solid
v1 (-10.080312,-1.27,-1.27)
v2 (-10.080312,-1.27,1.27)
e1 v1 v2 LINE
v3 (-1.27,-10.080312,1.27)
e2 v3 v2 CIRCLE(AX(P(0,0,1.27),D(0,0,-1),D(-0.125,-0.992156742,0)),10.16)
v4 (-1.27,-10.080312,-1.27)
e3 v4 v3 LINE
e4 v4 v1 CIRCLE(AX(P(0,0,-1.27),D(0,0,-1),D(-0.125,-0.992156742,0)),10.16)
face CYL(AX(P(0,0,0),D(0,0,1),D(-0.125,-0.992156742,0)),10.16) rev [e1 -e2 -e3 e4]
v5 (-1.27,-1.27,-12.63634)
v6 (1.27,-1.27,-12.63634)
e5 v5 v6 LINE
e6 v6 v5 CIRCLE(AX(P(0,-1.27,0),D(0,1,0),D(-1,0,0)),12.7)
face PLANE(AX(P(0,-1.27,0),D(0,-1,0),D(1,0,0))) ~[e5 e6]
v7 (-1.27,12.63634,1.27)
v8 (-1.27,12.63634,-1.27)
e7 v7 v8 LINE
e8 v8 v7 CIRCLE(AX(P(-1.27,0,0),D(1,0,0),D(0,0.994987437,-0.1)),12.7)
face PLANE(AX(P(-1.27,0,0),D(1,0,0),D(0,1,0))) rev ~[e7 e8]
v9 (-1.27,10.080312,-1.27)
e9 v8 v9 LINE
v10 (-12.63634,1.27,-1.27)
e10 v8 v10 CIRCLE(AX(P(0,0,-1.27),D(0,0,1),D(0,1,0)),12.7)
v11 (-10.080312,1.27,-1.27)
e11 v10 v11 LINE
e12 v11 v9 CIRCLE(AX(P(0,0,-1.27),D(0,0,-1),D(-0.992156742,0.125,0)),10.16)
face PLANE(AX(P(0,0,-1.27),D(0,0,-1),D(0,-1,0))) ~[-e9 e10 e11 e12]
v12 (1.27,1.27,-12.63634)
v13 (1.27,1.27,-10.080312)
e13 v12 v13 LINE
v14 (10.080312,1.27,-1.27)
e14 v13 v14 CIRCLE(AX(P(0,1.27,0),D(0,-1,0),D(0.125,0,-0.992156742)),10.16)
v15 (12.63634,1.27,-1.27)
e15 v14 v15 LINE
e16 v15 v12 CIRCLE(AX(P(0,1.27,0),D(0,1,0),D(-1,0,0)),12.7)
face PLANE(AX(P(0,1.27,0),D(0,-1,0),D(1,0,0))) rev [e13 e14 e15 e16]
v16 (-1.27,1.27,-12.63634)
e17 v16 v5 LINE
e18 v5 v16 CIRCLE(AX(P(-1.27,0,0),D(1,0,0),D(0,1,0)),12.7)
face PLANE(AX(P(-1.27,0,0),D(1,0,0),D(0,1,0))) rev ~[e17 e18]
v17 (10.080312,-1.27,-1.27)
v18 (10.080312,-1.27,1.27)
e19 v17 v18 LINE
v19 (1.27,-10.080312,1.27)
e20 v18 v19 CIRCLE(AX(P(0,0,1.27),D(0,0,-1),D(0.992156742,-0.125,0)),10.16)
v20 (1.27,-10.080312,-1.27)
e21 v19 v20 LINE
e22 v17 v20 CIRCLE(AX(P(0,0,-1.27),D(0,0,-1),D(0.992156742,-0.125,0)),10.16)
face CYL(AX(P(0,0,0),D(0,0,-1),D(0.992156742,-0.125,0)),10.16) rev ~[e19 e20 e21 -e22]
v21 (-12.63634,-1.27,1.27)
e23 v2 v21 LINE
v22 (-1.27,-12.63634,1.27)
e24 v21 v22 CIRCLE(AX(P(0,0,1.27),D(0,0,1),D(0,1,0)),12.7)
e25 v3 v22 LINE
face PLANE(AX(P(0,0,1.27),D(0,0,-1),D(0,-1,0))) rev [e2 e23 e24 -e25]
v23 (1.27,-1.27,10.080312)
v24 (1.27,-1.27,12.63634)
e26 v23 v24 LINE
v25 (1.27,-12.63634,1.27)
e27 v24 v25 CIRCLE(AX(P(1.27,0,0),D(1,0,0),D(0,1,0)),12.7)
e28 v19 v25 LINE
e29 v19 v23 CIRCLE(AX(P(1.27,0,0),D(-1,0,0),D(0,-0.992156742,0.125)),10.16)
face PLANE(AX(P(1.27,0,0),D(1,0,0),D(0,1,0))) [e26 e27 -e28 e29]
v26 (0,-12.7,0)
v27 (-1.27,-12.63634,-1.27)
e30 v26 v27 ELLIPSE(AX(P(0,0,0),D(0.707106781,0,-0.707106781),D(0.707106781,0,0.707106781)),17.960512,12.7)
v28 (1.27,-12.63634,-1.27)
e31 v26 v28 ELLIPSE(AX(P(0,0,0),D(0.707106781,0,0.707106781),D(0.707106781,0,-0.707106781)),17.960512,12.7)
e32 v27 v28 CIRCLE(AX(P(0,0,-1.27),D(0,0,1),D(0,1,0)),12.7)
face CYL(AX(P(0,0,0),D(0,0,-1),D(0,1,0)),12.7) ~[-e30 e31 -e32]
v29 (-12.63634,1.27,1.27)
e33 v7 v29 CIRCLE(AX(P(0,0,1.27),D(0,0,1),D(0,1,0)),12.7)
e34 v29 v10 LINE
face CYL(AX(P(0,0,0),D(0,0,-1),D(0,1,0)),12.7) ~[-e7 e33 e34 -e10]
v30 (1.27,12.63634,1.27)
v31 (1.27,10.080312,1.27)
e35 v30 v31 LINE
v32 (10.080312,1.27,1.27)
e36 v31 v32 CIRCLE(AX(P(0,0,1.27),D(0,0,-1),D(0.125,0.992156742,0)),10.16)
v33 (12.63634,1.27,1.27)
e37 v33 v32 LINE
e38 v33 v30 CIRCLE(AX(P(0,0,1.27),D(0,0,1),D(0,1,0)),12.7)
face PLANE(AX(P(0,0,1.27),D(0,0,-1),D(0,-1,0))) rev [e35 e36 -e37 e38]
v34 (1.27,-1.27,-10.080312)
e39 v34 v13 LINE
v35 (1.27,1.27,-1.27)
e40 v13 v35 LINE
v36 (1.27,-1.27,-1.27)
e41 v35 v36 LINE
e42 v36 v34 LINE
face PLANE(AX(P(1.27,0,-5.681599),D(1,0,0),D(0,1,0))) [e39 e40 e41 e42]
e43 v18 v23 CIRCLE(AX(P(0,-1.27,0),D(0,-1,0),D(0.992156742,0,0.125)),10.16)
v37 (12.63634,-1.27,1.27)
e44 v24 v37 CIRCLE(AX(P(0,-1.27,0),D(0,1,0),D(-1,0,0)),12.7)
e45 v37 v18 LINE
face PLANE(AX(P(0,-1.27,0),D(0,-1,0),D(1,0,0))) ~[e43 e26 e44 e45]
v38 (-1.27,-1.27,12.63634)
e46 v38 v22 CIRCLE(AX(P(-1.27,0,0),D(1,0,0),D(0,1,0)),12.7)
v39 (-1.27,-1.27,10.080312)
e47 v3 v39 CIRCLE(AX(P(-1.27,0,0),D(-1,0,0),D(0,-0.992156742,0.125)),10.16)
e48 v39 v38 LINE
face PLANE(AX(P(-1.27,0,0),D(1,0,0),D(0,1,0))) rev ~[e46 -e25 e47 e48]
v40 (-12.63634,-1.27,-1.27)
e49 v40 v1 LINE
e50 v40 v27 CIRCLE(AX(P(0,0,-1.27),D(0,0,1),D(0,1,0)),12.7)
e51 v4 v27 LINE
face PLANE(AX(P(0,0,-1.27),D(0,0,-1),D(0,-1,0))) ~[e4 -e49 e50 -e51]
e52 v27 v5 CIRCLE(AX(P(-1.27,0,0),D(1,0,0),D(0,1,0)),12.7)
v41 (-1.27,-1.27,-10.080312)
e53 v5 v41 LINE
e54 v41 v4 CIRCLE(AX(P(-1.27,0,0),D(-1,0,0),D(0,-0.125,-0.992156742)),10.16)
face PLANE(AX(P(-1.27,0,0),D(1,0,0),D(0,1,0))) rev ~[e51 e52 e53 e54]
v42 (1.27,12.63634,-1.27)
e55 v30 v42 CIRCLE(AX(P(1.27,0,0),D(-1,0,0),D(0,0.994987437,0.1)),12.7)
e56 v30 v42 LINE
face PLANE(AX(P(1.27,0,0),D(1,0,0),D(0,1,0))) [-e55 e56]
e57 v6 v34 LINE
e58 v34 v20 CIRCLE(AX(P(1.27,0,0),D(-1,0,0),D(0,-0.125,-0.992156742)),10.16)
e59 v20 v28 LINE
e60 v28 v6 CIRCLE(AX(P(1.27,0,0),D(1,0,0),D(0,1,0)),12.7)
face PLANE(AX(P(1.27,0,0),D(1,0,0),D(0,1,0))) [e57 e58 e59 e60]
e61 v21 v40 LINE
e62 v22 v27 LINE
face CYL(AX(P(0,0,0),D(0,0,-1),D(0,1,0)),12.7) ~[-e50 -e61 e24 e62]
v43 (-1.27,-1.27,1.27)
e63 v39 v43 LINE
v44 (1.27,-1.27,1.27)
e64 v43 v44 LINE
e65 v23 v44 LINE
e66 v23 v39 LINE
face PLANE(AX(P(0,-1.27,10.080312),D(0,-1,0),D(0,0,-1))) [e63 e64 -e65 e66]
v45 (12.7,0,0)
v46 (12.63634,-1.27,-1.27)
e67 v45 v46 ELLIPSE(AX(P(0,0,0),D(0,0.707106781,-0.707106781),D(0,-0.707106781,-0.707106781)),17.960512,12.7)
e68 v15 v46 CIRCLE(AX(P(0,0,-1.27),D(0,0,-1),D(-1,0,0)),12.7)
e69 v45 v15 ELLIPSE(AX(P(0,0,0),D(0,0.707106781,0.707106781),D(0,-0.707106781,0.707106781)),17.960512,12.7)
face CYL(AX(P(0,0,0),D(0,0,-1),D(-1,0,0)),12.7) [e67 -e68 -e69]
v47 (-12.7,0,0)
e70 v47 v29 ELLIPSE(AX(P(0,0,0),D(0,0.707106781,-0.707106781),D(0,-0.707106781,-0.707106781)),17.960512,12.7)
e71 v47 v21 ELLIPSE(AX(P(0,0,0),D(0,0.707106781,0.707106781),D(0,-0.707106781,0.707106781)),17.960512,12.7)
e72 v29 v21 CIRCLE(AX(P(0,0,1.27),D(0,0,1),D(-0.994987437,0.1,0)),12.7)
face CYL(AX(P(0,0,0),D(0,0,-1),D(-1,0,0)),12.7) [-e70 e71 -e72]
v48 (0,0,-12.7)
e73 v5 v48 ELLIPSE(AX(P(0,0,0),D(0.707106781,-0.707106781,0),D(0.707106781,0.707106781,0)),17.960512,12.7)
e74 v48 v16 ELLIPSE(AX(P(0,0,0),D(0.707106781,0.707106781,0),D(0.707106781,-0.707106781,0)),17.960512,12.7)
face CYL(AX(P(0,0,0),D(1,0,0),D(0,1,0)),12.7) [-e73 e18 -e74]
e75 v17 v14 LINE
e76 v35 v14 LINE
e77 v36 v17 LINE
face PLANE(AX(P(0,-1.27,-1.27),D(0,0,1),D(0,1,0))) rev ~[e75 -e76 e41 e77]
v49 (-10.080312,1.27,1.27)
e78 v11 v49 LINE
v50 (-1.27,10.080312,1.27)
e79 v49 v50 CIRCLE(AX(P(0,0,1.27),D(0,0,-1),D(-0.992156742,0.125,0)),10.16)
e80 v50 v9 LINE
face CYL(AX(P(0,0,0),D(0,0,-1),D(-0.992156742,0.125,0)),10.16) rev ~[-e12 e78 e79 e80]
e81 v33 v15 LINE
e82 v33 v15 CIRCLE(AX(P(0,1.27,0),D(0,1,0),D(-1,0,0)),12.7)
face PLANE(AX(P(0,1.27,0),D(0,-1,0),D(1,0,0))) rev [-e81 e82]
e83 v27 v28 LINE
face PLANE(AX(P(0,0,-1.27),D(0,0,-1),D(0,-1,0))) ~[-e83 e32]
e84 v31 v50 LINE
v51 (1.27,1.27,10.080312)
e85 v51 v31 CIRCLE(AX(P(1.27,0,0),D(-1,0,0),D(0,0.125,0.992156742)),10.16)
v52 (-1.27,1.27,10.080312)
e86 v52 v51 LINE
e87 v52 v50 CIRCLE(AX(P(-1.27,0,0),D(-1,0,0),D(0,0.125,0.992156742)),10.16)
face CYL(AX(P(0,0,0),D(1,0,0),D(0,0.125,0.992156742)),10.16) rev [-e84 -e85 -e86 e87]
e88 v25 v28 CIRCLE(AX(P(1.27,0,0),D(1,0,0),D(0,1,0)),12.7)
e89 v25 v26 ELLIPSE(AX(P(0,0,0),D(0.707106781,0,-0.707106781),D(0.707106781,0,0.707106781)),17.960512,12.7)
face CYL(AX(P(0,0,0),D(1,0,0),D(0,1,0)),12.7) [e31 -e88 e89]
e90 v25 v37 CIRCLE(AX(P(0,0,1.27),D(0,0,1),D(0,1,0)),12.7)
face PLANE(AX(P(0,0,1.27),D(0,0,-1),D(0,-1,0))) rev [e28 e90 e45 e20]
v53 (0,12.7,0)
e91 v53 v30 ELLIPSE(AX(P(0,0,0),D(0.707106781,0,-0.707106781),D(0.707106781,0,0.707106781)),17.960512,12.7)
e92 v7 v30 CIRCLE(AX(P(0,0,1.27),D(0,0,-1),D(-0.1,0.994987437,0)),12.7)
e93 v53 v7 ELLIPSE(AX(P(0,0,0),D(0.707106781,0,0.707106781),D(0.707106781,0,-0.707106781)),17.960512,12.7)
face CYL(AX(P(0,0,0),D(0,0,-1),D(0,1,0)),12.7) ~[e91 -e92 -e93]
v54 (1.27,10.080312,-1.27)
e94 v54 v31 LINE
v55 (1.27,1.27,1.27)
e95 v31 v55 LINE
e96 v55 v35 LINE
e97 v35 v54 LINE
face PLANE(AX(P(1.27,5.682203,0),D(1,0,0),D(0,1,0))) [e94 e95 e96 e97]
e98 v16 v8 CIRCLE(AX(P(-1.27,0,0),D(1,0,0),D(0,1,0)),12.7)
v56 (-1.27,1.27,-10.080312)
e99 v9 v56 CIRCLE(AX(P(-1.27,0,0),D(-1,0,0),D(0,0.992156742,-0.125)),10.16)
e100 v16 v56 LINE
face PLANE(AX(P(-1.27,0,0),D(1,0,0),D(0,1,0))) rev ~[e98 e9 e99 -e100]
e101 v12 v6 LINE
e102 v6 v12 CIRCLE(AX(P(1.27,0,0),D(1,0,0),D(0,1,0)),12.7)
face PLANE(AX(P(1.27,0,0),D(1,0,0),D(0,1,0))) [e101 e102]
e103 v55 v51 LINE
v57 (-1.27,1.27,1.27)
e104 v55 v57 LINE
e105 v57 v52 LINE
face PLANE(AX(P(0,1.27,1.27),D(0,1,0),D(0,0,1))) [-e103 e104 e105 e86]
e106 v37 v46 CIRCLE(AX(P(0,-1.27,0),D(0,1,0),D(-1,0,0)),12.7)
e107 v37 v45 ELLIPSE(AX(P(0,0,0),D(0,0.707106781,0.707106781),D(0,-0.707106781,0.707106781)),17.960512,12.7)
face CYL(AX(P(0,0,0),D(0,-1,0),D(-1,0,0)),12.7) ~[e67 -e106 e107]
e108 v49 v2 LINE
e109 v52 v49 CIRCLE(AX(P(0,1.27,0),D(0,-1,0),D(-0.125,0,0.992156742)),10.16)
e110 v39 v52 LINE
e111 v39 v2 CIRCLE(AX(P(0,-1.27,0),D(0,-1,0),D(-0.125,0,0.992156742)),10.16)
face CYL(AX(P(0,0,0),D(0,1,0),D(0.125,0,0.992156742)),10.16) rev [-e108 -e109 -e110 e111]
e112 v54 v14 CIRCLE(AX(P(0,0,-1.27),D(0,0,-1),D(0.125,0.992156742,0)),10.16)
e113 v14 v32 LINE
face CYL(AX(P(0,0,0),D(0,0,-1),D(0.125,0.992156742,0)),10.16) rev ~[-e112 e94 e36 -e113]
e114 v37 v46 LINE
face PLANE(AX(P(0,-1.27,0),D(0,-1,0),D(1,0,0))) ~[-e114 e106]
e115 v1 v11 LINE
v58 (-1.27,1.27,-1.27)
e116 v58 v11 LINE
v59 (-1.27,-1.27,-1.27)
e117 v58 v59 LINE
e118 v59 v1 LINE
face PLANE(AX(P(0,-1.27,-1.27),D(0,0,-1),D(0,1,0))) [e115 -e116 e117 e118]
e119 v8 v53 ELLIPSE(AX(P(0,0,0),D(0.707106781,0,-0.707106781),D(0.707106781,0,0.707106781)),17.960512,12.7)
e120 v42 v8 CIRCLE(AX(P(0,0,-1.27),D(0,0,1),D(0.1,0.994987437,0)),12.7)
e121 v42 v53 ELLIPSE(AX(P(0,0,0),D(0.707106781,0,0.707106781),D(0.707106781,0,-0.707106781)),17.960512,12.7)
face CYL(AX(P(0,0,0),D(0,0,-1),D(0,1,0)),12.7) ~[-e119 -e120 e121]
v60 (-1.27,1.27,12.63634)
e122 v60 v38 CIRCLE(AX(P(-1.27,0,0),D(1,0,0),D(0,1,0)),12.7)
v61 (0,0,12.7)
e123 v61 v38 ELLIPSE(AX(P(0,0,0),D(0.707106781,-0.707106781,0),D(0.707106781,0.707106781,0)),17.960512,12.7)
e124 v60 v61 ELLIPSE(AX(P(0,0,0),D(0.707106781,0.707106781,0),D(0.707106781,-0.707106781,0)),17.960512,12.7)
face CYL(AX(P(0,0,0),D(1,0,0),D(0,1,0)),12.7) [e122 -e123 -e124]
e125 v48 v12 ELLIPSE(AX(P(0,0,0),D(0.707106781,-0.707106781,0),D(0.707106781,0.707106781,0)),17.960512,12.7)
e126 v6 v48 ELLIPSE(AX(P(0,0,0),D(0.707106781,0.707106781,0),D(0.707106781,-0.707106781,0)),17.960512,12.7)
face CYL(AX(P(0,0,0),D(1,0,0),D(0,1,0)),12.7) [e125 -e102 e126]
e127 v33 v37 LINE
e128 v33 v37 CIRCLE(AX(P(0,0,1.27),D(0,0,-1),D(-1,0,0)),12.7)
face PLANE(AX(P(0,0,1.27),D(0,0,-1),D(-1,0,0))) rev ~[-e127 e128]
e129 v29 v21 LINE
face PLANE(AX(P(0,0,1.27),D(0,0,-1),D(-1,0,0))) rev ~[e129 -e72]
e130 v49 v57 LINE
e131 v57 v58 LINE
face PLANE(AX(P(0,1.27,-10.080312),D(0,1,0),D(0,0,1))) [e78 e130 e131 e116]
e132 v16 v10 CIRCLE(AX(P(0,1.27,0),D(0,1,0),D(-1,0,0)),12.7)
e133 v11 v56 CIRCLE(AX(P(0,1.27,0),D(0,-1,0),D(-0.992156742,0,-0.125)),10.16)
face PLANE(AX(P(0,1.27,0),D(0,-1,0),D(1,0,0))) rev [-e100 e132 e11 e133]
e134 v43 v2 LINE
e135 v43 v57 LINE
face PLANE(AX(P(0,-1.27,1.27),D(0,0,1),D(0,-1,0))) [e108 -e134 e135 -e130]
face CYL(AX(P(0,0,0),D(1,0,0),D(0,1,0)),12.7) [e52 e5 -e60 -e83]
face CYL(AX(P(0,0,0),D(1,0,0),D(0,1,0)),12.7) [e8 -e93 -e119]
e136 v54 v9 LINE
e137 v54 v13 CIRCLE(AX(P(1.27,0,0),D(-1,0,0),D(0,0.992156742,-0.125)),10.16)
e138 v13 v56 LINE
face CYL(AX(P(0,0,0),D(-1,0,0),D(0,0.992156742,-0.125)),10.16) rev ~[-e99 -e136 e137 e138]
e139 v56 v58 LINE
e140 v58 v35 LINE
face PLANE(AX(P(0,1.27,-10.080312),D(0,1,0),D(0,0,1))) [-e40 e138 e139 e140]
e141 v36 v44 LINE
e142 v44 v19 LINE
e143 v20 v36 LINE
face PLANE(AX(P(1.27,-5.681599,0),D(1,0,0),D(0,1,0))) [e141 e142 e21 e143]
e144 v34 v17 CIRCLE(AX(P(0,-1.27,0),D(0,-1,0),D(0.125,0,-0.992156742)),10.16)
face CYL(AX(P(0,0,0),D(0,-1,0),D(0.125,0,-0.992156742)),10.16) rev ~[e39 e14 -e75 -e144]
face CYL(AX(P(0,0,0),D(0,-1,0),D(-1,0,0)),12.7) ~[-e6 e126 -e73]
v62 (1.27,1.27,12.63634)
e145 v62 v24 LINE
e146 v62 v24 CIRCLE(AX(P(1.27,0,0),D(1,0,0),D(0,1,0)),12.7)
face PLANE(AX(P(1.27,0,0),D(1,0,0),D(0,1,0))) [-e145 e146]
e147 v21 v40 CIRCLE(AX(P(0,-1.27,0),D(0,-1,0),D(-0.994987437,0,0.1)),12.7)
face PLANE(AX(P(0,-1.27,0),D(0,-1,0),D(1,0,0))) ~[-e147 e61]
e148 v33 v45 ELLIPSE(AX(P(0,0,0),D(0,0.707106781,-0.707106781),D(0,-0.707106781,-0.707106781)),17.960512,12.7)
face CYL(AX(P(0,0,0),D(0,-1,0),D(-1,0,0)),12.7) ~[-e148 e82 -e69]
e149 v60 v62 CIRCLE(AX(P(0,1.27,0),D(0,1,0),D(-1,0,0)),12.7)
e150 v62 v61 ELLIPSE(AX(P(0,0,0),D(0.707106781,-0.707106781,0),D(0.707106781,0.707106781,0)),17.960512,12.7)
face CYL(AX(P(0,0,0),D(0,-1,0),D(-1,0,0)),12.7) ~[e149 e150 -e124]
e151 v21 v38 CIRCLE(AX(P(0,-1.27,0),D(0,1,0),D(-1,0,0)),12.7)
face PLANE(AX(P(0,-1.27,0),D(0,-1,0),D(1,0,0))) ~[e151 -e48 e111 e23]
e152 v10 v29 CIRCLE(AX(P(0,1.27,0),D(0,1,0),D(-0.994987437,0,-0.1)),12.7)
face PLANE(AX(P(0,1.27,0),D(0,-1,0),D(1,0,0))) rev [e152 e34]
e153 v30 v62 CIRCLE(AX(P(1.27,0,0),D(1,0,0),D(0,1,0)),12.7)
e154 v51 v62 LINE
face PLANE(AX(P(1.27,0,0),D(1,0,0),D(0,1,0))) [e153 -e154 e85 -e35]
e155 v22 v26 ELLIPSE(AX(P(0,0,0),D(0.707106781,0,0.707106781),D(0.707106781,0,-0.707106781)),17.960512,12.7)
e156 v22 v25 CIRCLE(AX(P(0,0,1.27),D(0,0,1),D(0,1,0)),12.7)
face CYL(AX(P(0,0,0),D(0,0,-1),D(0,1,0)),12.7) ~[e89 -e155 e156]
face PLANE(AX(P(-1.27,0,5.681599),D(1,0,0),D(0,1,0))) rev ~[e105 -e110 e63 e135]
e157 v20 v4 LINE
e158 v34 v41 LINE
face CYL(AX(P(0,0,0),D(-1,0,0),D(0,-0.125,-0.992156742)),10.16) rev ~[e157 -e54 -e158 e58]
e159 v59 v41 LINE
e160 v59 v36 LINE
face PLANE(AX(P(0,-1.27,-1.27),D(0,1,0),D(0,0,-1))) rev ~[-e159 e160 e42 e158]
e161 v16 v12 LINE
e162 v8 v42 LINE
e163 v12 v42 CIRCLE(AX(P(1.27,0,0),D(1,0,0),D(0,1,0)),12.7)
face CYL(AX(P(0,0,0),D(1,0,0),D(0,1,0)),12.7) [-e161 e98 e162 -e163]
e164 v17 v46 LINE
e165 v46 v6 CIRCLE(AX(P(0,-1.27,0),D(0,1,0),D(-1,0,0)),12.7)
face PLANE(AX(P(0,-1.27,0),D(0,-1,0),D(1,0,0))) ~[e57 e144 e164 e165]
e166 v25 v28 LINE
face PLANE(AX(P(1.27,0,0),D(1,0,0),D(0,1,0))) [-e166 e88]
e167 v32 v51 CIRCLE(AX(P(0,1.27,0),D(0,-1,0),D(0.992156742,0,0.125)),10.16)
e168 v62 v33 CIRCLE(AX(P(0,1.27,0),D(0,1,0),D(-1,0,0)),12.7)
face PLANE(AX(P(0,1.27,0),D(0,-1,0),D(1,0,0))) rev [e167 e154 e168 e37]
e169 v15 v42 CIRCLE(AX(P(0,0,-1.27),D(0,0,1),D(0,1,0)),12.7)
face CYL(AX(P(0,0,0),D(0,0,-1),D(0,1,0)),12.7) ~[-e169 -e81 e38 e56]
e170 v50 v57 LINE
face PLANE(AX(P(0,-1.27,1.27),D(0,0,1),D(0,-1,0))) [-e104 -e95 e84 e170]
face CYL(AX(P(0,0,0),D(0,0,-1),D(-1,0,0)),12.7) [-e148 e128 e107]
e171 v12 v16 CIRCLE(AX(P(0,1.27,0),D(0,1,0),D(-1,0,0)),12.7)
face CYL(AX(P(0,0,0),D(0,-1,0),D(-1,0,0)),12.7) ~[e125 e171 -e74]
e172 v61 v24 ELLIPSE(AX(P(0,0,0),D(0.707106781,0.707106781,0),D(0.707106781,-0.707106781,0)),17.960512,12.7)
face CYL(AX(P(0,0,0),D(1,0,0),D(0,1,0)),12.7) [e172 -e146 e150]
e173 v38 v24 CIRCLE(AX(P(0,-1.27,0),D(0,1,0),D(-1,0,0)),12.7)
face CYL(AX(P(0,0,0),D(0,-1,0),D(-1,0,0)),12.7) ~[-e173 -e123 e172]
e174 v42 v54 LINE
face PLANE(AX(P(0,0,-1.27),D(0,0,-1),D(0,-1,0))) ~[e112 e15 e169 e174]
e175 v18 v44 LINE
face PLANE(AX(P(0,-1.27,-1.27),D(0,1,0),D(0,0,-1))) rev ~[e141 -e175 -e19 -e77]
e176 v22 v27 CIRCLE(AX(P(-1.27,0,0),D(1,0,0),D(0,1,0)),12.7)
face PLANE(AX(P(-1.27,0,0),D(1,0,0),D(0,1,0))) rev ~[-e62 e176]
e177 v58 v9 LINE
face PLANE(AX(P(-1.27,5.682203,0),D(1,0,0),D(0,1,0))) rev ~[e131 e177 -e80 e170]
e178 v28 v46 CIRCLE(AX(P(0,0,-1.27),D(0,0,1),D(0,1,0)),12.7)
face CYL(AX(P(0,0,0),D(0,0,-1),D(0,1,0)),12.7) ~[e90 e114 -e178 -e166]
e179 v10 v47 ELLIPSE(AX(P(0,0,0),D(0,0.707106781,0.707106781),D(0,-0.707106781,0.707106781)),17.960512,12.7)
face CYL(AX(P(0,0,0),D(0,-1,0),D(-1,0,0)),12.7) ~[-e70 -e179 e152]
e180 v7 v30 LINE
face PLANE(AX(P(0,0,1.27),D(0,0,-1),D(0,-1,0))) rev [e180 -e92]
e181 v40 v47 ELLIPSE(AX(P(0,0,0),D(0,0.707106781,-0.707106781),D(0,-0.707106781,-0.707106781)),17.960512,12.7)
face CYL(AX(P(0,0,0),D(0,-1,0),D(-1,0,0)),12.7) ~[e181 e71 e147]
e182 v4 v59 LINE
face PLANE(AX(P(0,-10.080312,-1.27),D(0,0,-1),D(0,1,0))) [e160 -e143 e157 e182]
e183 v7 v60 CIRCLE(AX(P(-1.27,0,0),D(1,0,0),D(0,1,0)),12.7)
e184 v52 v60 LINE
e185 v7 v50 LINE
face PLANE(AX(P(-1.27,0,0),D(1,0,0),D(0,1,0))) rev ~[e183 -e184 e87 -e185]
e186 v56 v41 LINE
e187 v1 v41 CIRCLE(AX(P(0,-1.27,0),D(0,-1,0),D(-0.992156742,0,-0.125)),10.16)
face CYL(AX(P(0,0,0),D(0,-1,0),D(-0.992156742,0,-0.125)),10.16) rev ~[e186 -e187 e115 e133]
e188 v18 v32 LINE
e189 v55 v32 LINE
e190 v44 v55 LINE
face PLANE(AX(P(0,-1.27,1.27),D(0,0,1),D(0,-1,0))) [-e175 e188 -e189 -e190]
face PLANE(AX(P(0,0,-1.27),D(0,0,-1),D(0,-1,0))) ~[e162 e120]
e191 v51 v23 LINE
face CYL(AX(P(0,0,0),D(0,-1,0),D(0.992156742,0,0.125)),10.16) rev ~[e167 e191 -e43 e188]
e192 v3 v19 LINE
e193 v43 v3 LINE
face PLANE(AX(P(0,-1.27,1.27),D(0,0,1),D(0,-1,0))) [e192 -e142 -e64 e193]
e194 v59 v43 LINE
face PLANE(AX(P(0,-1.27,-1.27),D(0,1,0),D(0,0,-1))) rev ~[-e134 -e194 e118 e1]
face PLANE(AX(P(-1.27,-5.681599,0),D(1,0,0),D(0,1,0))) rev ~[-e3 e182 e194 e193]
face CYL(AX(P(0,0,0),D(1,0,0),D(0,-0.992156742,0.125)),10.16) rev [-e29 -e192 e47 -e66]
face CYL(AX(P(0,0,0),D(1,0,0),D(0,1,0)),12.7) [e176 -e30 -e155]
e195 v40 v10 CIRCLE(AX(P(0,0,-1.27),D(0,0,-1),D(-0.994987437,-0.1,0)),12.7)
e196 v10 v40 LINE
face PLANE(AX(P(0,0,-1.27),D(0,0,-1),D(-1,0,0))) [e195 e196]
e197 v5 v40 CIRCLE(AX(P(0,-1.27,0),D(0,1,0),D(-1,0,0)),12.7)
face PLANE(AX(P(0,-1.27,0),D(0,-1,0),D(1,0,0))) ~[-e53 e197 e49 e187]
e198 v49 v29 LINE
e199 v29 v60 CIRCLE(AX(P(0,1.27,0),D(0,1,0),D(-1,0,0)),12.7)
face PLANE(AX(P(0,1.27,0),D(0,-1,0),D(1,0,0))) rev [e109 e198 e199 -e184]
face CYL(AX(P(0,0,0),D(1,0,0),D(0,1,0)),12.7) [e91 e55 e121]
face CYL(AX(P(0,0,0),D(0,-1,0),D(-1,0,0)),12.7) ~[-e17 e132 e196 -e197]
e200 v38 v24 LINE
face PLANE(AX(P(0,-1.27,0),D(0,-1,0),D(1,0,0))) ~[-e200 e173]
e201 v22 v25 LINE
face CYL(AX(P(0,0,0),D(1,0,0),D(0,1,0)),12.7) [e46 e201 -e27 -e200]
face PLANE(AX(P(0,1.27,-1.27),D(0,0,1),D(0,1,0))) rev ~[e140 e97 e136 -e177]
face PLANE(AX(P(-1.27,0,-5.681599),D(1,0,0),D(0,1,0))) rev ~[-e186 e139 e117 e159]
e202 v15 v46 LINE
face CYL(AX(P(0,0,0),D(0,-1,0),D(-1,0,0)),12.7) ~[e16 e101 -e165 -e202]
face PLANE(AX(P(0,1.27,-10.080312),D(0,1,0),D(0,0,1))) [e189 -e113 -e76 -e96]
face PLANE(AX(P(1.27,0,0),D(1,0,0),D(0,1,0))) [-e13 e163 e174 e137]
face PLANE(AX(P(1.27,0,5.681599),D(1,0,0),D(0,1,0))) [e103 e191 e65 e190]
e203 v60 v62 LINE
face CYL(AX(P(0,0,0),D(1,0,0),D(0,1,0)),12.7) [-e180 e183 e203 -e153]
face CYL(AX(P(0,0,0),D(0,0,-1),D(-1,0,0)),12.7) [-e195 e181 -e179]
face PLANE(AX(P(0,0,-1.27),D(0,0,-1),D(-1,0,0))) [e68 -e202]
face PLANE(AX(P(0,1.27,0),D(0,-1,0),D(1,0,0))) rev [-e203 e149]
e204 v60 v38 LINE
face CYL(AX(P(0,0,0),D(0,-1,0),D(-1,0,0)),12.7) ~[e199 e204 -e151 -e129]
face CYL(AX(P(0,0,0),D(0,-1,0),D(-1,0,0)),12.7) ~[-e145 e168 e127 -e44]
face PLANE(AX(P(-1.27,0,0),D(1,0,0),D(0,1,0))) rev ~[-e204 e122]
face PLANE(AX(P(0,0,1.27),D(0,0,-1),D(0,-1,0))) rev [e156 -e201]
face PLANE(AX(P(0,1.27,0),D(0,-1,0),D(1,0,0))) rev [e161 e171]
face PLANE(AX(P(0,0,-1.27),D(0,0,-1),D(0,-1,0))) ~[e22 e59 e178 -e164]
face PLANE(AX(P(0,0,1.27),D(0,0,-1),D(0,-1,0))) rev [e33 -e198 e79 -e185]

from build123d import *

# Parameters (mm, degrees)
F0_R          = 12.7
F1_DEPTH      = 1.27
F1_DEPTH_BACK = 1.27
F0_W          = 2.54
F0_H          = 2.54
F2_DEPTH      = 10.16
F2_DEPTH_BACK = 10.16
F3_DEPTH      = 1.27
F3_DEPTH_BACK = 1.27
F4_DEPTH      = 1.27
F4_DEPTH_BACK = 1.27
F5_DEPTH      = 1.27
F5_DEPTH_BACK = 1.27
F6_DEPTH      = 1.27
F6_DEPTH_BACK = 1.27


# Not quite as in the source:
# - a feature of the source that left no trace in its solid (it failed there, or was rolled back) is left out
# - a pattern or mirror of a feature is missing from the dataset's text; its kind, count and spacing are read off the source's solid


with BuildPart() as f1:
    # F0 (on Right) → F1 (new body, two sides)
    with BuildSketch(Plane.YZ) as f1_sk:
        Circle(F0_R)
        with BuildLine():
            ThreePointArc((-10.0803124952, 1.27), (-7.1842048969, 7.1842048969), (-1.27, 10.0803124952))
            ThreePointArc((-1.27, 10.0803124952), (0, 10.16), (1.27, 10.0803124952))
            ThreePointArc((1.27, 10.0803124952), (7.1842048969, 7.1842048969), (10.0803124952, 1.27))
            ThreePointArc((10.0803124952, 1.27), (10.1400585538, 0.6362487914), (10.16, 0))
            ThreePointArc((10.16, 0), (10.1400585538, -0.6362487914), (10.0803124952, -1.27))
            ThreePointArc((10.0803124952, -1.27), (7.1842048969, -7.1842048969), (1.27, -10.0803124952))
            ThreePointArc((1.27, -10.0803124952), (0, -10.16), (-1.27, -10.0803124952))
            ThreePointArc((-1.27, -10.0803124952), (-7.1842048969, -7.1842048969), (-10.0803124952, -1.27))
            ThreePointArc((-10.0803124952, -1.27), (-10.16, 0), (-10.0803124952, 1.27))
        make_face(mode=Mode.SUBTRACT)
    extrude(amount=F1_DEPTH)
    extrude(f1_sk.sketch, amount=-F1_DEPTH_BACK)

    # F1_copies: F1 across plane


with BuildPart() as f1_1:
    add(f1.part)
    add(f1.part.mirror(Plane(origin=(0, 0, 0), x_dir=(0.7071067812, 0, -0.7071067812), z_dir=(0.7071067812, 0, 0.7071067812))))

    # F1_copies1: F1 across plane


with BuildPart() as f1_2:
    add(f1_1.part)
    add(f1_1.part.mirror(Plane(origin=(0, 0, 0), x_dir=(-0.7071067812, 0.7071067812, 0), z_dir=(-0.7071067812, -0.7071067812, 0))))

    # F0 (on Right) → F2 (join, two sides)
    with BuildSketch(Plane.YZ) as f2_sk:
        Rectangle(F0_W, F0_H)
    extrude(amount=F2_DEPTH)
    extrude(f2_sk.sketch, amount=-F2_DEPTH_BACK)

    # F0 (on Right) → F3 (join, two sides)
    with BuildSketch(Plane.YZ) as f3_sk:
        with BuildLine():
            Line((1.27, -1.27), (-1.27, -1.27))
            Line((-1.27, -1.27), (-1.27, -10.0803124952))
            ThreePointArc((-1.27, -10.0803124952), (0, -10.16), (1.27, -10.0803124952))
            Line((1.27, -10.0803124952), (1.27, -1.27))
        make_face()
    extrude(amount=F3_DEPTH)
    extrude(f3_sk.sketch, amount=-F3_DEPTH_BACK)

    # F0 (on Right) → F4 (join, two sides)
    with BuildSketch(Plane.YZ) as f4_sk:
        with BuildLine():
            Line((10.0803124952, 1.27), (1.27, 1.27))
            Line((1.27, 1.27), (1.27, -1.27))
            Line((1.27, -1.27), (10.0803124952, -1.27))
            ThreePointArc((10.0803124952, -1.27), (10.1400585538, -0.6362487914), (10.16, 0))
            ThreePointArc((10.16, 0), (10.1400585538, 0.6362487914), (10.0803124952, 1.27))
        make_face()
    extrude(amount=F4_DEPTH)
    extrude(f4_sk.sketch, amount=-F4_DEPTH_BACK)

    # F0 (on Right) → F5 (join, two sides)
    with BuildSketch(Plane.YZ) as f5_sk:
        with BuildLine():
            Line((-1.27, -1.27), (-1.27, 1.27))
            Line((-1.27, 1.27), (-10.0803124952, 1.27))
            ThreePointArc((-10.0803124952, 1.27), (-10.16, 0), (-10.0803124952, -1.27))
            Line((-10.0803124952, -1.27), (-1.27, -1.27))
        make_face()
    extrude(amount=F5_DEPTH)
    extrude(f5_sk.sketch, amount=-F5_DEPTH_BACK)

    # F0 (on Right) → F6 (join, two sides)
    with BuildSketch(Plane.YZ) as f6_sk:
        with BuildLine():
            Line((-1.27, 10.0803124952), (-1.27, 1.27))
            Line((-1.27, 1.27), (1.27, 1.27))
            Line((1.27, 1.27), (1.27, 10.0803124952))
            ThreePointArc((1.27, 10.0803124952), (0, 10.16), (-1.27, 10.0803124952))
        make_face()
    extrude(amount=F6_DEPTH)
    extrude(f6_sk.sketch, amount=-F6_DEPTH_BACK)


solid = f1_2.part
